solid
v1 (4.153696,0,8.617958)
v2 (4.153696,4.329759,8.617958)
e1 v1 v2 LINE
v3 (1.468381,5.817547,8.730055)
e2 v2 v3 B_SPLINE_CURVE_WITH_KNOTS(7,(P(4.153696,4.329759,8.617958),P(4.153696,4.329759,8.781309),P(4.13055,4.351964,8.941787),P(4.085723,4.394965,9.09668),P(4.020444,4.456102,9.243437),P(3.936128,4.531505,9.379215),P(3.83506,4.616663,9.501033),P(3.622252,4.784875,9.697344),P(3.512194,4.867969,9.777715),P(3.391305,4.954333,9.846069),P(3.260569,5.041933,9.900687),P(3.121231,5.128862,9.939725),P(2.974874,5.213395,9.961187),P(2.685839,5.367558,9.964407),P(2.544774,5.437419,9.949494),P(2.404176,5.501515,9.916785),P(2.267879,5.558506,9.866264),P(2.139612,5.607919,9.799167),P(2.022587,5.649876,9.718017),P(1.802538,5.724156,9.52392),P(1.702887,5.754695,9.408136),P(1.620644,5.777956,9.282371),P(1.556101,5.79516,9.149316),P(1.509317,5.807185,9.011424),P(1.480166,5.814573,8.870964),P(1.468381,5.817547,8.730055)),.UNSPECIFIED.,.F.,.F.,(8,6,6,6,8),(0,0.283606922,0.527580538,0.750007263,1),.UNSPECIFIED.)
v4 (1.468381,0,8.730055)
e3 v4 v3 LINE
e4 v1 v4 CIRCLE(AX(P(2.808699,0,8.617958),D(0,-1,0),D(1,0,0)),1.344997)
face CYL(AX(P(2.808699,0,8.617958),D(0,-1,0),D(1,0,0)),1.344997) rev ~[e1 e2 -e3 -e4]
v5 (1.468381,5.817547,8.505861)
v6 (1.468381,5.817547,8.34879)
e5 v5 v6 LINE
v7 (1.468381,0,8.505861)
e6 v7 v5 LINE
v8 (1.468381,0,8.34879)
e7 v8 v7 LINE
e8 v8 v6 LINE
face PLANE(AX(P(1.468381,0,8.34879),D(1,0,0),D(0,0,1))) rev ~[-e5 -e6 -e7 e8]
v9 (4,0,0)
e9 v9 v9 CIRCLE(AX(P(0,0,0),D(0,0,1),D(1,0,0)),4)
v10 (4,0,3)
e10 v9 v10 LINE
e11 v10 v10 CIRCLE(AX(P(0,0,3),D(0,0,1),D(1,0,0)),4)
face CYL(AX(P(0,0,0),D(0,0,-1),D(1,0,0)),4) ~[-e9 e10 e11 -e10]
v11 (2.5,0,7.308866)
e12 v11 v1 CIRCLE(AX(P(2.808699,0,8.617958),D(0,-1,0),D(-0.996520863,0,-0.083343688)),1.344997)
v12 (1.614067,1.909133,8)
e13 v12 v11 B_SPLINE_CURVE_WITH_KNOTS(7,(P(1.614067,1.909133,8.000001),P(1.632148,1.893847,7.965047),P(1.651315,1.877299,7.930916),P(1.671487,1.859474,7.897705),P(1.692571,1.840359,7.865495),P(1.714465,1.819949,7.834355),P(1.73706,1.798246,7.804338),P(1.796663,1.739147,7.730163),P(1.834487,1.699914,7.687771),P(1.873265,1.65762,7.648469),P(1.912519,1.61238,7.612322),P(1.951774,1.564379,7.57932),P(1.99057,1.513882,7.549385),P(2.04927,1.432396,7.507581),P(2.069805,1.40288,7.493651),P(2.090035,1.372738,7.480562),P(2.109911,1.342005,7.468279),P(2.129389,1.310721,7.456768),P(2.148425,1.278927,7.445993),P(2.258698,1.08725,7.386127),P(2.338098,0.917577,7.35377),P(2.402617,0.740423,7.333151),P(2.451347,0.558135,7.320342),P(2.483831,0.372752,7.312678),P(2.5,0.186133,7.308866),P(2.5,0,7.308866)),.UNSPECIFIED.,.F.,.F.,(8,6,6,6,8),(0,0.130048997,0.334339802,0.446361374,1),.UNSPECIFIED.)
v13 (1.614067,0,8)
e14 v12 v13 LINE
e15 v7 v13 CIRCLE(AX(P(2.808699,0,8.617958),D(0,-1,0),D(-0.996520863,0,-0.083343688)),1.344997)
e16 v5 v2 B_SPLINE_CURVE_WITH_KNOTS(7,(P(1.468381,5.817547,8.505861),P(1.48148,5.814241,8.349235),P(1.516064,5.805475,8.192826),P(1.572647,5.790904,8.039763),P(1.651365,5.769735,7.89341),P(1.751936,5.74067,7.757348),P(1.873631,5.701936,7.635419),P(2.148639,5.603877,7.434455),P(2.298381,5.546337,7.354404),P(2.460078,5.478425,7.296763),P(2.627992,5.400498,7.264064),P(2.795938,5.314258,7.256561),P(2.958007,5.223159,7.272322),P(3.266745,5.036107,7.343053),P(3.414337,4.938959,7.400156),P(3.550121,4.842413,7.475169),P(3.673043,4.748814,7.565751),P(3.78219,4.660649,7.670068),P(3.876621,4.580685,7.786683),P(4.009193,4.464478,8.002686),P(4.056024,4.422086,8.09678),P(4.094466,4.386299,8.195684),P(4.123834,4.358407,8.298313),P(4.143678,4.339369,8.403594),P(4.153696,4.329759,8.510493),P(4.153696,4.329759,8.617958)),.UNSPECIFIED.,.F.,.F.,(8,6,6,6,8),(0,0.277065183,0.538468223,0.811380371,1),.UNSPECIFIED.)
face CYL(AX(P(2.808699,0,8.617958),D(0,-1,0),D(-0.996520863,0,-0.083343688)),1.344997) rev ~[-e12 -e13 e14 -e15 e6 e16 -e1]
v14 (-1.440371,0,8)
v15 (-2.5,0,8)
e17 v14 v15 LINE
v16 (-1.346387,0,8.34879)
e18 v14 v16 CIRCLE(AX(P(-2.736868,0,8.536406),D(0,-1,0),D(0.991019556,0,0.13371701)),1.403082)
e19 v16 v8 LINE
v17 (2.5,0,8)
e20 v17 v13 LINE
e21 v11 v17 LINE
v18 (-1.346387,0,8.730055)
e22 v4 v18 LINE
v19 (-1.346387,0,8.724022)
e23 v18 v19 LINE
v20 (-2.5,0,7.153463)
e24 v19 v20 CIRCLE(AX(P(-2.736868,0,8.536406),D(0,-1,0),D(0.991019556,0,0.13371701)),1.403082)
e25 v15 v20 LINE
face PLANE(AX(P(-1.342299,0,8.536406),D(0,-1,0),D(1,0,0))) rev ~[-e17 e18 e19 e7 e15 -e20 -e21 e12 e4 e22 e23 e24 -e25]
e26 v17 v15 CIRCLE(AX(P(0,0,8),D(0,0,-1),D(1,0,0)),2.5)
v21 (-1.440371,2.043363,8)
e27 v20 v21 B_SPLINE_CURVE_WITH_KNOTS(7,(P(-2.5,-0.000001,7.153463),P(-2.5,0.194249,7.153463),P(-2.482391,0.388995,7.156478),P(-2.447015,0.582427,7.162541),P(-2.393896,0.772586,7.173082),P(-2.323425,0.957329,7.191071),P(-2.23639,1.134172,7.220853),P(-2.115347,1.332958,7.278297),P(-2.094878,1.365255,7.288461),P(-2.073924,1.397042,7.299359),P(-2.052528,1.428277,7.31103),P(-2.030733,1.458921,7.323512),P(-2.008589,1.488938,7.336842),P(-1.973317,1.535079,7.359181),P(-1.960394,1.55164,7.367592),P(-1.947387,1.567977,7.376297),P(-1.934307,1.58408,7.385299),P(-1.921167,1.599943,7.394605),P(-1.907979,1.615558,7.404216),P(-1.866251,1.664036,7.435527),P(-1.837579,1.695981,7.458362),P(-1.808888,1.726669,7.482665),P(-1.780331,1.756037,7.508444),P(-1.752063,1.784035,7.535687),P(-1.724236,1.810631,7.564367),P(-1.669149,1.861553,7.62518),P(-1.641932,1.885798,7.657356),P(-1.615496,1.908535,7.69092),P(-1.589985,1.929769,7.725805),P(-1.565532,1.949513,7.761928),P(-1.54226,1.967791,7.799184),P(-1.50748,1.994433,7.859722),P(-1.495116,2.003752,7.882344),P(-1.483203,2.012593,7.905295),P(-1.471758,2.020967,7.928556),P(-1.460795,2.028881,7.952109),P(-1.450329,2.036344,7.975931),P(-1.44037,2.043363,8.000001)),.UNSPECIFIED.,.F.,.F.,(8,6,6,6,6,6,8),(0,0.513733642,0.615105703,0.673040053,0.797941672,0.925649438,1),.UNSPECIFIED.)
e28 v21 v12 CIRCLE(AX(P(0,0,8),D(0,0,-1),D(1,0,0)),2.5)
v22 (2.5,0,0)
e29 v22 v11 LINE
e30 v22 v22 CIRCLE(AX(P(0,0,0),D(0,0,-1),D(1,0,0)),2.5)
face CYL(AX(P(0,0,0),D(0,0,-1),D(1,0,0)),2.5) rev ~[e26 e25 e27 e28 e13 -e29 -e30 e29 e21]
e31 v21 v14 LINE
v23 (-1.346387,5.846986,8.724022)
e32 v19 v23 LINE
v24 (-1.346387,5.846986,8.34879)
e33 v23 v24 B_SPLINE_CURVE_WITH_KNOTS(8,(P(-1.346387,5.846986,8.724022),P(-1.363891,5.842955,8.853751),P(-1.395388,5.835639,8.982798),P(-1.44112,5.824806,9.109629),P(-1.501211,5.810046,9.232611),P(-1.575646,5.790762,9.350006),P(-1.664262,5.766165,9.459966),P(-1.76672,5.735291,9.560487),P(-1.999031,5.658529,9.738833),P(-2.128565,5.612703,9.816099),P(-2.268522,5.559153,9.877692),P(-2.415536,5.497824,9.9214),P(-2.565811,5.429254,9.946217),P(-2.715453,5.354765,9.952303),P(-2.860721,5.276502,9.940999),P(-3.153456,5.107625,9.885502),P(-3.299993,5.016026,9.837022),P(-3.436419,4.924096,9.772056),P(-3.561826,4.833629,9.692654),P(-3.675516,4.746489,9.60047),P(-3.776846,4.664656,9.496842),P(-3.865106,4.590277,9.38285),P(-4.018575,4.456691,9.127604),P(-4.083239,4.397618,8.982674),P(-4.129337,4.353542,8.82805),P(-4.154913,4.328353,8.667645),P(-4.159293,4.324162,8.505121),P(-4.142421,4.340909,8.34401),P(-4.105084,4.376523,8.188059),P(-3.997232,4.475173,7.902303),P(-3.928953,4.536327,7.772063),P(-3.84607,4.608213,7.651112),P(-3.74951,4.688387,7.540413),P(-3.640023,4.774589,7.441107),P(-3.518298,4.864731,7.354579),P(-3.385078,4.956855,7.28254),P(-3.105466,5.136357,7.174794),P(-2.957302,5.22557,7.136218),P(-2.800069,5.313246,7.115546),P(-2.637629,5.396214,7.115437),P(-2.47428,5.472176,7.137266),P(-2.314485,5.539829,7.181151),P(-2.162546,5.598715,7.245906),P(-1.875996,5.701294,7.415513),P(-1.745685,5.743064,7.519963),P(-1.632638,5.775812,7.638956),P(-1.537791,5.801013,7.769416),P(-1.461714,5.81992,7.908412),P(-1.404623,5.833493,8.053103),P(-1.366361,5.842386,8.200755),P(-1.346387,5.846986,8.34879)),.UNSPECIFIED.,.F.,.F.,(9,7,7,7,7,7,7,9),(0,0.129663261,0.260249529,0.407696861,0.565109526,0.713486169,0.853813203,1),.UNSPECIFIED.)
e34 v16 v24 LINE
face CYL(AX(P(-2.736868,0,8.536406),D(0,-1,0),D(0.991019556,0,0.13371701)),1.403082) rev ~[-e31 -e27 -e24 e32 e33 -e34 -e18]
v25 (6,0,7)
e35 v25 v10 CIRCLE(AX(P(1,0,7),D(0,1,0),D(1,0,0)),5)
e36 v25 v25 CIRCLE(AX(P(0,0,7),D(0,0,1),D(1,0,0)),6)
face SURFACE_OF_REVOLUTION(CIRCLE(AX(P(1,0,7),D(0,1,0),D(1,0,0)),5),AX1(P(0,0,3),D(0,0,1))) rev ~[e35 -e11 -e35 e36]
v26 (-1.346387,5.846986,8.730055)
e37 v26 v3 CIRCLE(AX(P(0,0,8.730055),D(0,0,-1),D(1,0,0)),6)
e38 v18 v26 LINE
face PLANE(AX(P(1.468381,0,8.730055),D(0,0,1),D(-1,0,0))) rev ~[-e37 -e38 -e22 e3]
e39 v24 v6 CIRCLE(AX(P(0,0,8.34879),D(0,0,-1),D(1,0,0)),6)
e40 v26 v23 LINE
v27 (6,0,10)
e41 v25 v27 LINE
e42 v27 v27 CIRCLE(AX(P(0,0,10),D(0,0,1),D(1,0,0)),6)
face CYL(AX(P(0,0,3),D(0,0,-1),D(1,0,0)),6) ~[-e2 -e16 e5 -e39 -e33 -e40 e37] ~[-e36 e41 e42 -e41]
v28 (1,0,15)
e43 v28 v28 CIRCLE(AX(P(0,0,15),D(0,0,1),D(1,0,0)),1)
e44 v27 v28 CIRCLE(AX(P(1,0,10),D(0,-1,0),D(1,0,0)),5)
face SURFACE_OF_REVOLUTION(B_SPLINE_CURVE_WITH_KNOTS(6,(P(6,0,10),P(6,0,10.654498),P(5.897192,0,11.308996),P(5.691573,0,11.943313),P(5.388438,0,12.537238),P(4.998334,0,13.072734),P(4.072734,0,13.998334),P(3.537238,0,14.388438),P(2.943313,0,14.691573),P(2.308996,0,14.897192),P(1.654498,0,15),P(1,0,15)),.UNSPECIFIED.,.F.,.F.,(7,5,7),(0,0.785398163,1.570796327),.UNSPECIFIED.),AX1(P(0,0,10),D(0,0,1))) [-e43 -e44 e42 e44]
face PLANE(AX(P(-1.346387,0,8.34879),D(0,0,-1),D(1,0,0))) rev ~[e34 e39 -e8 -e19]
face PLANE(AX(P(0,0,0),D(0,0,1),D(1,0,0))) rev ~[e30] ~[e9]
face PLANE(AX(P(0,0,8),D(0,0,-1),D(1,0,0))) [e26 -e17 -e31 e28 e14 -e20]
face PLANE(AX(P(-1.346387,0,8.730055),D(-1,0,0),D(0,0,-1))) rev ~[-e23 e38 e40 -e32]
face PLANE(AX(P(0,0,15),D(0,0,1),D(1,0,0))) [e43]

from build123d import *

# Parameters (mm, degrees)
F0_R     = 4
F1_DEPTH = 3
F2_R     = 6
F3_DEPTH = 12
F4_R     = 5
F6_R     = 2.5
F7_DEPTH = 8
F9_DEPTH = 8


# Not quite as in the source:
# - a fillet or chamfer that OpenCascade refuses, or shapes differently, is made with other operations: its cross-section is extruded or revolved along the edge and cut away or added


with BuildPart() as f1:
    # F0 (on Top) → F1 (new body)
    with BuildSketch(Plane.XY):
        Circle(F0_R)
    extrude(amount=F1_DEPTH)

    # F2 (on face) → F3 (join)
    with BuildSketch(Plane.XY.offset(3)):
        Circle(F2_R)
    extrude(amount=F3_DEPTH)

    # F4
    f4_edges = [f1.edges().sort_by_distance(p)[0] for p in [
        (-6, 0, 15),
    ]]
    fillet(f4_edges, radius=F4_R)

    # F5: fillet of radius 5 on 1 edges, made by hand

    # F5_s1 → F5_t2 (revolve, cut)
    with BuildSketch(Plane.XZ):
        with BuildLine():
            ThreePointArc((6, 7), (5.472135955, 4.7639320225), (4, 3))
            Line((4, 3), (6, 3))
            Line((6, 3), (6, 7))
        make_face()
    revolve(axis=Axis((0, 0, 3), (0, 0, 1)), mode=Mode.SUBTRACT)

    # F6 (on face) → F7 (cut)
    with BuildSketch(Plane(origin=(0, 0, 0), x_dir=(1, 0, 0), z_dir=(0, 0, -1))):
        Circle(F6_R)
    extrude(amount=-F7_DEPTH, mode=Mode.SUBTRACT)

    # F8 (on Front) → F9 (cut)
    with BuildSketch(Plane.XZ):
        with BuildLine():
            Line((-1.3463870705, 8.7240217328), (-1.3463870705, 8.3487899899))
            ThreePointArc((-1.3463870705, 8.3487899899), (-1.3369403935, 8.4423866045), (-1.3337867757, 8.5364058614))
            ThreePointArc((-1.3337867757, 8.5364058614), (-1.3369403935, 8.6304251183), (-1.3463870705, 8.7240217328))
        make_face()
        with BuildLine():
            ThreePointArc((-1.3337867757, 8.5364058614), (-1.3369403935, 8.4423866045), (-1.3463870705, 8.3487899899))
            Line((-1.3463870705, 8.3487899899), (1.4683810595, 8.3487899899))
            Line((1.4683810595, 8.3487899899), (1.4683810595, 8.5058610392))
            ThreePointArc((1.4683810595, 8.5058610392), (1.4637016301, 8.6179580539), (1.4683810595, 8.7300550686))
            Line((1.4683810595, 8.7300550686), (-1.3463870705, 8.7300550686))
            Line((-1.3463870705, 8.7300550686), (-1.3463870705, 8.7240217328))
            ThreePointArc((-1.3463870705, 8.7240217328), (-1.3369403935, 8.6304251183), (-1.3337867757, 8.5364058614))
        make_face()
        with BuildLine():
            ThreePointArc((-1.3463870705, 8.7240217328), (-4.1399498979, 8.5364058614), (-1.3463870705, 8.3487899899))
            Line((-1.3463870705, 8.3487899899), (-1.3463870705, 8.7240217328))
        make_face()
        with BuildLine():
            Line((1.4683810595, 8.7300550686), (1.4683810595, 8.5058610392))
            ThreePointArc((1.4683810595, 8.5058610392), (2.864796007, 7.2741313647), (4.1536957416, 8.6179580539))
            ThreePointArc((4.1536957416, 8.6179580539), (2.864796007, 9.9617847432), (1.4683810595, 8.7300550686))
        make_face()
        with BuildLine():
            ThreePointArc((1.4683810595, 8.7300550686), (1.4637016301, 8.6179580539), (1.4683810595, 8.5058610392))
            Line((1.4683810595, 8.5058610392), (1.4683810595, 8.7300550686))
        make_face()
    extrude(amount=-F9_DEPTH, mode=Mode.SUBTRACT)


solid = f1.part
